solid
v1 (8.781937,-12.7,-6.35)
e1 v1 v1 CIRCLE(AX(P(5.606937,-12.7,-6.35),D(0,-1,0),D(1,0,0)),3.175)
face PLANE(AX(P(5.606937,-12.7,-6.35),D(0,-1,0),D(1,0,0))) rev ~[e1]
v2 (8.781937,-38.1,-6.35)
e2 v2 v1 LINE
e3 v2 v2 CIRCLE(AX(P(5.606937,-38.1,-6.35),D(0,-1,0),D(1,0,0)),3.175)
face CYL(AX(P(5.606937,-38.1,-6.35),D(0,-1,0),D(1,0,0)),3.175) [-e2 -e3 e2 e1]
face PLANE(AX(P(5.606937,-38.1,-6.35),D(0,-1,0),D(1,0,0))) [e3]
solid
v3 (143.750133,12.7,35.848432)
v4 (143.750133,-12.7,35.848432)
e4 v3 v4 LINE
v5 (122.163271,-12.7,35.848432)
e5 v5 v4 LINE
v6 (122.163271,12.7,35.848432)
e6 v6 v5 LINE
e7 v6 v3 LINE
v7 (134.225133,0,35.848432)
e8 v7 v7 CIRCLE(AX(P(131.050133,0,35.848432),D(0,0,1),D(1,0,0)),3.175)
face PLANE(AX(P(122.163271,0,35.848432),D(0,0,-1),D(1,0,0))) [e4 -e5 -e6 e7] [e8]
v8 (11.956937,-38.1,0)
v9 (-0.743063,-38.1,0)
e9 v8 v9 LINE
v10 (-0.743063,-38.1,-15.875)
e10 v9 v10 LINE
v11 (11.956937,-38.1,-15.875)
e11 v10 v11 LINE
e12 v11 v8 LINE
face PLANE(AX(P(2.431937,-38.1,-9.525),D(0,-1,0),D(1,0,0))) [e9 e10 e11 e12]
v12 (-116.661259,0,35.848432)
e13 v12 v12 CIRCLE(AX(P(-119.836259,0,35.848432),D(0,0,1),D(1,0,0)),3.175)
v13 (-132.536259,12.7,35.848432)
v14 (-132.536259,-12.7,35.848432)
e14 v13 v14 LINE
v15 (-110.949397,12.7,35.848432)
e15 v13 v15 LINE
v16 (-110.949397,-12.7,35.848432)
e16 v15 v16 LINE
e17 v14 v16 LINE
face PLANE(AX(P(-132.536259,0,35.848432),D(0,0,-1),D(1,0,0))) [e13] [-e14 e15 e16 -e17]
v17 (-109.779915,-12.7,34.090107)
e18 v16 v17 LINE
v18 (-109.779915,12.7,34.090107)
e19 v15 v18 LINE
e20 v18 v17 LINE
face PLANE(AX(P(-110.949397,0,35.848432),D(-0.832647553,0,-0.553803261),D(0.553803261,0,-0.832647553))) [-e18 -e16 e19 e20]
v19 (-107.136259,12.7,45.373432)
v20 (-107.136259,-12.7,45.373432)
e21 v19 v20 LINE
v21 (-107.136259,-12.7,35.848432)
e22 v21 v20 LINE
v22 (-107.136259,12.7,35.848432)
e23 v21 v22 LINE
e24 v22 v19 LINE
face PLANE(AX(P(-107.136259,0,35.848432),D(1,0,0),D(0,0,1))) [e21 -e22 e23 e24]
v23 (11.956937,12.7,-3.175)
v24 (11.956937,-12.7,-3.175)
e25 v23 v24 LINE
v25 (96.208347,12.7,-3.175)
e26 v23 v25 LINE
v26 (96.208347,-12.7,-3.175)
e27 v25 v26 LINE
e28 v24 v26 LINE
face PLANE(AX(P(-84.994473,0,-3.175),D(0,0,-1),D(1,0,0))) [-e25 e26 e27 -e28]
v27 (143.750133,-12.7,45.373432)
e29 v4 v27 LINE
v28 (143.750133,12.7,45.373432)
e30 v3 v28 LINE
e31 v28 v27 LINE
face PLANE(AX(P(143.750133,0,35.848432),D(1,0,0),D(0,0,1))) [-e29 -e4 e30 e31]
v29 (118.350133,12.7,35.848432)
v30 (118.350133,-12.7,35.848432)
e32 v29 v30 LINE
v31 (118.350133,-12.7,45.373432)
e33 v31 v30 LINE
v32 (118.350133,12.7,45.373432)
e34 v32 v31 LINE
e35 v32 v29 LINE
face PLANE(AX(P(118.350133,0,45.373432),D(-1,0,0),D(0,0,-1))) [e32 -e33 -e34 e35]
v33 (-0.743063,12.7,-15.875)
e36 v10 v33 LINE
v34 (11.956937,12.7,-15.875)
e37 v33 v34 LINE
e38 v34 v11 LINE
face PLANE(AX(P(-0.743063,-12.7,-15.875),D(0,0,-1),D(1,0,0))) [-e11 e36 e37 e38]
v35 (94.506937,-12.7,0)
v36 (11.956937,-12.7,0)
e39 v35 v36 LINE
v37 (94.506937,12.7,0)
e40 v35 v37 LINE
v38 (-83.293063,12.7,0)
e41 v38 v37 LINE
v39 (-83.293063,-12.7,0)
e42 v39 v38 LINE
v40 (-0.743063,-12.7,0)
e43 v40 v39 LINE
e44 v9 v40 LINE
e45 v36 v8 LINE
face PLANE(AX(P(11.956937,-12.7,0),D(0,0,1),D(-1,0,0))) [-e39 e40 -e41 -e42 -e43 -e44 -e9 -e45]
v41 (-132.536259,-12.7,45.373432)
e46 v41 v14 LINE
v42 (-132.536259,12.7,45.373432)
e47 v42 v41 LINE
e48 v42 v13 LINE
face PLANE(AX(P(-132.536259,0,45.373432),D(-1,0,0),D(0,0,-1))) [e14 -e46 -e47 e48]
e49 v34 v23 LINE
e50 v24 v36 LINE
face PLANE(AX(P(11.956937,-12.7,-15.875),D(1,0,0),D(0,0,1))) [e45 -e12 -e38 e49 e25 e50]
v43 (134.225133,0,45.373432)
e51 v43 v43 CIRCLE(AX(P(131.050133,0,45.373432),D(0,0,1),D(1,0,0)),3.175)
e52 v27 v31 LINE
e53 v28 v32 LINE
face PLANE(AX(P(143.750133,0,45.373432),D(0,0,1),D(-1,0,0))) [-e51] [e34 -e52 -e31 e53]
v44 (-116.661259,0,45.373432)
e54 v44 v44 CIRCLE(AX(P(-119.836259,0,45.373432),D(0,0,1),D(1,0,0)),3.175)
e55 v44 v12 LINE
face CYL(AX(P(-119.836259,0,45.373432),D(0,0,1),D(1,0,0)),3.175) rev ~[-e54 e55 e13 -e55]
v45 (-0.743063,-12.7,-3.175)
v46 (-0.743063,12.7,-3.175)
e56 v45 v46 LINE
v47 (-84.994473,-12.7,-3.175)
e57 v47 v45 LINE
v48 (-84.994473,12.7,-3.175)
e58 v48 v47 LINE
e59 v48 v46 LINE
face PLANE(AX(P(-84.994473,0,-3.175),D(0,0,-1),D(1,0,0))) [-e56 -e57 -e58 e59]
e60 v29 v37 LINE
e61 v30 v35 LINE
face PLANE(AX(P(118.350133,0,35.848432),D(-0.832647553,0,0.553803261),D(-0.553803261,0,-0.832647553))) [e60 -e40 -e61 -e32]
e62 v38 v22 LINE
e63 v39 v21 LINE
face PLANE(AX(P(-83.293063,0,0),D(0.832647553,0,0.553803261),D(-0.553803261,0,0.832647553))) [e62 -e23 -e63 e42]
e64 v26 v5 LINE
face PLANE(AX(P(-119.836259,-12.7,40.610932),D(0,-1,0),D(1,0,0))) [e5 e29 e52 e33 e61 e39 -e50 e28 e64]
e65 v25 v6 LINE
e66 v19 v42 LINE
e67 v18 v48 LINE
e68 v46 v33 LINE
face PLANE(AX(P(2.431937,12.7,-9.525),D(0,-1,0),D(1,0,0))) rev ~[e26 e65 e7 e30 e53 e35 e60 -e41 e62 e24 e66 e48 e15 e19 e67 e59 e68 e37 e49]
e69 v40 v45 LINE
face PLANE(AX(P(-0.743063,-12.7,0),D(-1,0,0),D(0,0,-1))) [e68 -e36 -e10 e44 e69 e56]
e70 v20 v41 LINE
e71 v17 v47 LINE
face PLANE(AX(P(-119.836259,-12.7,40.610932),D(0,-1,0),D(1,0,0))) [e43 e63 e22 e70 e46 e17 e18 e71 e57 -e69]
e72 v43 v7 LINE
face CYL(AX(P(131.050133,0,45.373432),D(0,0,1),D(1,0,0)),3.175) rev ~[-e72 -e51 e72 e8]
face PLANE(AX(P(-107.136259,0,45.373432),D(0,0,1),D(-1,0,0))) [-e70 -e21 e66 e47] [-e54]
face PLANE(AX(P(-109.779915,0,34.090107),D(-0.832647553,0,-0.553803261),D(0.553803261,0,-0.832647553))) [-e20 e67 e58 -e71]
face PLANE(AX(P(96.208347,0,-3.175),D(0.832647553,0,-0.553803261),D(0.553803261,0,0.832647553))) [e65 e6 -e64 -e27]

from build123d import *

# Parameters (mm, degrees)
F1_DEPTH = 12.7
F2_W     = 6.35
F2_H     = 12.7
F2_H_2   = 3.175
F3_DEPTH = 25.4
F4_R     = 3.175
F5_DEPTH = 25.4
F6_R     = 3.175
F7_DEPTH = 25.4
F8_R     = 3.175
F9_DEPTH = 25.4


# Not quite as in the source:
# - a feature names something its author has since deleted; it is built from what else it names


with BuildPart() as f1:
    # F0 (on Front) → F1 (new body, symmetric)
    with BuildSketch(Plane.XZ):
        Polygon((-110.9493968193, 35.8484322961), (-107.1362588495, 35.8484322961), (-107.1362588495, 45.3734322961), (-132.5362588495, 45.3734322961), (-132.5362588495, 35.8484322961), align=None)
        Polygon((94.5069370505, 0), (-83.2930629495, 0), (-107.1362588495, 35.8484322961), (-110.9493968193, 35.8484322961), (-109.7799148305, 34.090106941), (-84.9944726753, -3.175), (96.2083467763, -3.175), (122.1632709203, 35.8484322961), (118.3501329505, 35.8484322961), align=None)
        Polygon((118.3501329505, 45.3734322961), (118.3501329505, 35.8484322961), (122.1632709203, 35.8484322961), (128.4984556522, 45.3734322961), align=None)
        Polygon((128.4984556522, 45.3734322961), (122.1632709203, 35.8484322961), (143.7501329505, 35.8484322961), (143.7501329505, 45.3734322961), align=None)
    extrude(amount=F1_DEPTH, both=True)

    # F2 (on face) → F3 (join, symmetric)
    with BuildSketch(Plane.XZ.offset(12.7)):
        with Locations((2.4319370505, -9.525)):
            Rectangle(F2_W, F2_H)
        with Locations((8.7819370505, -9.525)):
            Rectangle(F2_W, F2_H)
        with Locations((8.7819370505, -1.5875)):
            Rectangle(F2_W, F2_H_2)
        Polygon((5.6069370505, -3.175), (5.6069370505, 0), (0, 0), (-0.7430629495, 0), (-0.7430629495, -3.175), align=None)
    extrude(amount=F3_DEPTH, both=True)

    # F6 (on face) → F7 (cut)
    with BuildSketch(Plane.XY.offset(45.3734322961)):
        with Locations((131.0501329505, 0)):
            Circle(F6_R)
    extrude(amount=-F7_DEPTH, mode=Mode.SUBTRACT)

    # F8 (on face) → F9 (cut)
    with BuildSketch(Plane.XY.offset(45.3734322961)):
        with Locations((-119.8362588495, 0)):
            Circle(F8_R)
    extrude(amount=-F9_DEPTH, mode=Mode.SUBTRACT)


with BuildPart() as f5:
    # F4 (on face) → F5 (new body)
    with BuildSketch(Plane.XZ.offset(38.1)):
        with Locations((5.6069370505, -6.35)):
            Circle(F4_R)
    extrude(amount=-F5_DEPTH)


solid = Compound([f1.part, f5.part])
